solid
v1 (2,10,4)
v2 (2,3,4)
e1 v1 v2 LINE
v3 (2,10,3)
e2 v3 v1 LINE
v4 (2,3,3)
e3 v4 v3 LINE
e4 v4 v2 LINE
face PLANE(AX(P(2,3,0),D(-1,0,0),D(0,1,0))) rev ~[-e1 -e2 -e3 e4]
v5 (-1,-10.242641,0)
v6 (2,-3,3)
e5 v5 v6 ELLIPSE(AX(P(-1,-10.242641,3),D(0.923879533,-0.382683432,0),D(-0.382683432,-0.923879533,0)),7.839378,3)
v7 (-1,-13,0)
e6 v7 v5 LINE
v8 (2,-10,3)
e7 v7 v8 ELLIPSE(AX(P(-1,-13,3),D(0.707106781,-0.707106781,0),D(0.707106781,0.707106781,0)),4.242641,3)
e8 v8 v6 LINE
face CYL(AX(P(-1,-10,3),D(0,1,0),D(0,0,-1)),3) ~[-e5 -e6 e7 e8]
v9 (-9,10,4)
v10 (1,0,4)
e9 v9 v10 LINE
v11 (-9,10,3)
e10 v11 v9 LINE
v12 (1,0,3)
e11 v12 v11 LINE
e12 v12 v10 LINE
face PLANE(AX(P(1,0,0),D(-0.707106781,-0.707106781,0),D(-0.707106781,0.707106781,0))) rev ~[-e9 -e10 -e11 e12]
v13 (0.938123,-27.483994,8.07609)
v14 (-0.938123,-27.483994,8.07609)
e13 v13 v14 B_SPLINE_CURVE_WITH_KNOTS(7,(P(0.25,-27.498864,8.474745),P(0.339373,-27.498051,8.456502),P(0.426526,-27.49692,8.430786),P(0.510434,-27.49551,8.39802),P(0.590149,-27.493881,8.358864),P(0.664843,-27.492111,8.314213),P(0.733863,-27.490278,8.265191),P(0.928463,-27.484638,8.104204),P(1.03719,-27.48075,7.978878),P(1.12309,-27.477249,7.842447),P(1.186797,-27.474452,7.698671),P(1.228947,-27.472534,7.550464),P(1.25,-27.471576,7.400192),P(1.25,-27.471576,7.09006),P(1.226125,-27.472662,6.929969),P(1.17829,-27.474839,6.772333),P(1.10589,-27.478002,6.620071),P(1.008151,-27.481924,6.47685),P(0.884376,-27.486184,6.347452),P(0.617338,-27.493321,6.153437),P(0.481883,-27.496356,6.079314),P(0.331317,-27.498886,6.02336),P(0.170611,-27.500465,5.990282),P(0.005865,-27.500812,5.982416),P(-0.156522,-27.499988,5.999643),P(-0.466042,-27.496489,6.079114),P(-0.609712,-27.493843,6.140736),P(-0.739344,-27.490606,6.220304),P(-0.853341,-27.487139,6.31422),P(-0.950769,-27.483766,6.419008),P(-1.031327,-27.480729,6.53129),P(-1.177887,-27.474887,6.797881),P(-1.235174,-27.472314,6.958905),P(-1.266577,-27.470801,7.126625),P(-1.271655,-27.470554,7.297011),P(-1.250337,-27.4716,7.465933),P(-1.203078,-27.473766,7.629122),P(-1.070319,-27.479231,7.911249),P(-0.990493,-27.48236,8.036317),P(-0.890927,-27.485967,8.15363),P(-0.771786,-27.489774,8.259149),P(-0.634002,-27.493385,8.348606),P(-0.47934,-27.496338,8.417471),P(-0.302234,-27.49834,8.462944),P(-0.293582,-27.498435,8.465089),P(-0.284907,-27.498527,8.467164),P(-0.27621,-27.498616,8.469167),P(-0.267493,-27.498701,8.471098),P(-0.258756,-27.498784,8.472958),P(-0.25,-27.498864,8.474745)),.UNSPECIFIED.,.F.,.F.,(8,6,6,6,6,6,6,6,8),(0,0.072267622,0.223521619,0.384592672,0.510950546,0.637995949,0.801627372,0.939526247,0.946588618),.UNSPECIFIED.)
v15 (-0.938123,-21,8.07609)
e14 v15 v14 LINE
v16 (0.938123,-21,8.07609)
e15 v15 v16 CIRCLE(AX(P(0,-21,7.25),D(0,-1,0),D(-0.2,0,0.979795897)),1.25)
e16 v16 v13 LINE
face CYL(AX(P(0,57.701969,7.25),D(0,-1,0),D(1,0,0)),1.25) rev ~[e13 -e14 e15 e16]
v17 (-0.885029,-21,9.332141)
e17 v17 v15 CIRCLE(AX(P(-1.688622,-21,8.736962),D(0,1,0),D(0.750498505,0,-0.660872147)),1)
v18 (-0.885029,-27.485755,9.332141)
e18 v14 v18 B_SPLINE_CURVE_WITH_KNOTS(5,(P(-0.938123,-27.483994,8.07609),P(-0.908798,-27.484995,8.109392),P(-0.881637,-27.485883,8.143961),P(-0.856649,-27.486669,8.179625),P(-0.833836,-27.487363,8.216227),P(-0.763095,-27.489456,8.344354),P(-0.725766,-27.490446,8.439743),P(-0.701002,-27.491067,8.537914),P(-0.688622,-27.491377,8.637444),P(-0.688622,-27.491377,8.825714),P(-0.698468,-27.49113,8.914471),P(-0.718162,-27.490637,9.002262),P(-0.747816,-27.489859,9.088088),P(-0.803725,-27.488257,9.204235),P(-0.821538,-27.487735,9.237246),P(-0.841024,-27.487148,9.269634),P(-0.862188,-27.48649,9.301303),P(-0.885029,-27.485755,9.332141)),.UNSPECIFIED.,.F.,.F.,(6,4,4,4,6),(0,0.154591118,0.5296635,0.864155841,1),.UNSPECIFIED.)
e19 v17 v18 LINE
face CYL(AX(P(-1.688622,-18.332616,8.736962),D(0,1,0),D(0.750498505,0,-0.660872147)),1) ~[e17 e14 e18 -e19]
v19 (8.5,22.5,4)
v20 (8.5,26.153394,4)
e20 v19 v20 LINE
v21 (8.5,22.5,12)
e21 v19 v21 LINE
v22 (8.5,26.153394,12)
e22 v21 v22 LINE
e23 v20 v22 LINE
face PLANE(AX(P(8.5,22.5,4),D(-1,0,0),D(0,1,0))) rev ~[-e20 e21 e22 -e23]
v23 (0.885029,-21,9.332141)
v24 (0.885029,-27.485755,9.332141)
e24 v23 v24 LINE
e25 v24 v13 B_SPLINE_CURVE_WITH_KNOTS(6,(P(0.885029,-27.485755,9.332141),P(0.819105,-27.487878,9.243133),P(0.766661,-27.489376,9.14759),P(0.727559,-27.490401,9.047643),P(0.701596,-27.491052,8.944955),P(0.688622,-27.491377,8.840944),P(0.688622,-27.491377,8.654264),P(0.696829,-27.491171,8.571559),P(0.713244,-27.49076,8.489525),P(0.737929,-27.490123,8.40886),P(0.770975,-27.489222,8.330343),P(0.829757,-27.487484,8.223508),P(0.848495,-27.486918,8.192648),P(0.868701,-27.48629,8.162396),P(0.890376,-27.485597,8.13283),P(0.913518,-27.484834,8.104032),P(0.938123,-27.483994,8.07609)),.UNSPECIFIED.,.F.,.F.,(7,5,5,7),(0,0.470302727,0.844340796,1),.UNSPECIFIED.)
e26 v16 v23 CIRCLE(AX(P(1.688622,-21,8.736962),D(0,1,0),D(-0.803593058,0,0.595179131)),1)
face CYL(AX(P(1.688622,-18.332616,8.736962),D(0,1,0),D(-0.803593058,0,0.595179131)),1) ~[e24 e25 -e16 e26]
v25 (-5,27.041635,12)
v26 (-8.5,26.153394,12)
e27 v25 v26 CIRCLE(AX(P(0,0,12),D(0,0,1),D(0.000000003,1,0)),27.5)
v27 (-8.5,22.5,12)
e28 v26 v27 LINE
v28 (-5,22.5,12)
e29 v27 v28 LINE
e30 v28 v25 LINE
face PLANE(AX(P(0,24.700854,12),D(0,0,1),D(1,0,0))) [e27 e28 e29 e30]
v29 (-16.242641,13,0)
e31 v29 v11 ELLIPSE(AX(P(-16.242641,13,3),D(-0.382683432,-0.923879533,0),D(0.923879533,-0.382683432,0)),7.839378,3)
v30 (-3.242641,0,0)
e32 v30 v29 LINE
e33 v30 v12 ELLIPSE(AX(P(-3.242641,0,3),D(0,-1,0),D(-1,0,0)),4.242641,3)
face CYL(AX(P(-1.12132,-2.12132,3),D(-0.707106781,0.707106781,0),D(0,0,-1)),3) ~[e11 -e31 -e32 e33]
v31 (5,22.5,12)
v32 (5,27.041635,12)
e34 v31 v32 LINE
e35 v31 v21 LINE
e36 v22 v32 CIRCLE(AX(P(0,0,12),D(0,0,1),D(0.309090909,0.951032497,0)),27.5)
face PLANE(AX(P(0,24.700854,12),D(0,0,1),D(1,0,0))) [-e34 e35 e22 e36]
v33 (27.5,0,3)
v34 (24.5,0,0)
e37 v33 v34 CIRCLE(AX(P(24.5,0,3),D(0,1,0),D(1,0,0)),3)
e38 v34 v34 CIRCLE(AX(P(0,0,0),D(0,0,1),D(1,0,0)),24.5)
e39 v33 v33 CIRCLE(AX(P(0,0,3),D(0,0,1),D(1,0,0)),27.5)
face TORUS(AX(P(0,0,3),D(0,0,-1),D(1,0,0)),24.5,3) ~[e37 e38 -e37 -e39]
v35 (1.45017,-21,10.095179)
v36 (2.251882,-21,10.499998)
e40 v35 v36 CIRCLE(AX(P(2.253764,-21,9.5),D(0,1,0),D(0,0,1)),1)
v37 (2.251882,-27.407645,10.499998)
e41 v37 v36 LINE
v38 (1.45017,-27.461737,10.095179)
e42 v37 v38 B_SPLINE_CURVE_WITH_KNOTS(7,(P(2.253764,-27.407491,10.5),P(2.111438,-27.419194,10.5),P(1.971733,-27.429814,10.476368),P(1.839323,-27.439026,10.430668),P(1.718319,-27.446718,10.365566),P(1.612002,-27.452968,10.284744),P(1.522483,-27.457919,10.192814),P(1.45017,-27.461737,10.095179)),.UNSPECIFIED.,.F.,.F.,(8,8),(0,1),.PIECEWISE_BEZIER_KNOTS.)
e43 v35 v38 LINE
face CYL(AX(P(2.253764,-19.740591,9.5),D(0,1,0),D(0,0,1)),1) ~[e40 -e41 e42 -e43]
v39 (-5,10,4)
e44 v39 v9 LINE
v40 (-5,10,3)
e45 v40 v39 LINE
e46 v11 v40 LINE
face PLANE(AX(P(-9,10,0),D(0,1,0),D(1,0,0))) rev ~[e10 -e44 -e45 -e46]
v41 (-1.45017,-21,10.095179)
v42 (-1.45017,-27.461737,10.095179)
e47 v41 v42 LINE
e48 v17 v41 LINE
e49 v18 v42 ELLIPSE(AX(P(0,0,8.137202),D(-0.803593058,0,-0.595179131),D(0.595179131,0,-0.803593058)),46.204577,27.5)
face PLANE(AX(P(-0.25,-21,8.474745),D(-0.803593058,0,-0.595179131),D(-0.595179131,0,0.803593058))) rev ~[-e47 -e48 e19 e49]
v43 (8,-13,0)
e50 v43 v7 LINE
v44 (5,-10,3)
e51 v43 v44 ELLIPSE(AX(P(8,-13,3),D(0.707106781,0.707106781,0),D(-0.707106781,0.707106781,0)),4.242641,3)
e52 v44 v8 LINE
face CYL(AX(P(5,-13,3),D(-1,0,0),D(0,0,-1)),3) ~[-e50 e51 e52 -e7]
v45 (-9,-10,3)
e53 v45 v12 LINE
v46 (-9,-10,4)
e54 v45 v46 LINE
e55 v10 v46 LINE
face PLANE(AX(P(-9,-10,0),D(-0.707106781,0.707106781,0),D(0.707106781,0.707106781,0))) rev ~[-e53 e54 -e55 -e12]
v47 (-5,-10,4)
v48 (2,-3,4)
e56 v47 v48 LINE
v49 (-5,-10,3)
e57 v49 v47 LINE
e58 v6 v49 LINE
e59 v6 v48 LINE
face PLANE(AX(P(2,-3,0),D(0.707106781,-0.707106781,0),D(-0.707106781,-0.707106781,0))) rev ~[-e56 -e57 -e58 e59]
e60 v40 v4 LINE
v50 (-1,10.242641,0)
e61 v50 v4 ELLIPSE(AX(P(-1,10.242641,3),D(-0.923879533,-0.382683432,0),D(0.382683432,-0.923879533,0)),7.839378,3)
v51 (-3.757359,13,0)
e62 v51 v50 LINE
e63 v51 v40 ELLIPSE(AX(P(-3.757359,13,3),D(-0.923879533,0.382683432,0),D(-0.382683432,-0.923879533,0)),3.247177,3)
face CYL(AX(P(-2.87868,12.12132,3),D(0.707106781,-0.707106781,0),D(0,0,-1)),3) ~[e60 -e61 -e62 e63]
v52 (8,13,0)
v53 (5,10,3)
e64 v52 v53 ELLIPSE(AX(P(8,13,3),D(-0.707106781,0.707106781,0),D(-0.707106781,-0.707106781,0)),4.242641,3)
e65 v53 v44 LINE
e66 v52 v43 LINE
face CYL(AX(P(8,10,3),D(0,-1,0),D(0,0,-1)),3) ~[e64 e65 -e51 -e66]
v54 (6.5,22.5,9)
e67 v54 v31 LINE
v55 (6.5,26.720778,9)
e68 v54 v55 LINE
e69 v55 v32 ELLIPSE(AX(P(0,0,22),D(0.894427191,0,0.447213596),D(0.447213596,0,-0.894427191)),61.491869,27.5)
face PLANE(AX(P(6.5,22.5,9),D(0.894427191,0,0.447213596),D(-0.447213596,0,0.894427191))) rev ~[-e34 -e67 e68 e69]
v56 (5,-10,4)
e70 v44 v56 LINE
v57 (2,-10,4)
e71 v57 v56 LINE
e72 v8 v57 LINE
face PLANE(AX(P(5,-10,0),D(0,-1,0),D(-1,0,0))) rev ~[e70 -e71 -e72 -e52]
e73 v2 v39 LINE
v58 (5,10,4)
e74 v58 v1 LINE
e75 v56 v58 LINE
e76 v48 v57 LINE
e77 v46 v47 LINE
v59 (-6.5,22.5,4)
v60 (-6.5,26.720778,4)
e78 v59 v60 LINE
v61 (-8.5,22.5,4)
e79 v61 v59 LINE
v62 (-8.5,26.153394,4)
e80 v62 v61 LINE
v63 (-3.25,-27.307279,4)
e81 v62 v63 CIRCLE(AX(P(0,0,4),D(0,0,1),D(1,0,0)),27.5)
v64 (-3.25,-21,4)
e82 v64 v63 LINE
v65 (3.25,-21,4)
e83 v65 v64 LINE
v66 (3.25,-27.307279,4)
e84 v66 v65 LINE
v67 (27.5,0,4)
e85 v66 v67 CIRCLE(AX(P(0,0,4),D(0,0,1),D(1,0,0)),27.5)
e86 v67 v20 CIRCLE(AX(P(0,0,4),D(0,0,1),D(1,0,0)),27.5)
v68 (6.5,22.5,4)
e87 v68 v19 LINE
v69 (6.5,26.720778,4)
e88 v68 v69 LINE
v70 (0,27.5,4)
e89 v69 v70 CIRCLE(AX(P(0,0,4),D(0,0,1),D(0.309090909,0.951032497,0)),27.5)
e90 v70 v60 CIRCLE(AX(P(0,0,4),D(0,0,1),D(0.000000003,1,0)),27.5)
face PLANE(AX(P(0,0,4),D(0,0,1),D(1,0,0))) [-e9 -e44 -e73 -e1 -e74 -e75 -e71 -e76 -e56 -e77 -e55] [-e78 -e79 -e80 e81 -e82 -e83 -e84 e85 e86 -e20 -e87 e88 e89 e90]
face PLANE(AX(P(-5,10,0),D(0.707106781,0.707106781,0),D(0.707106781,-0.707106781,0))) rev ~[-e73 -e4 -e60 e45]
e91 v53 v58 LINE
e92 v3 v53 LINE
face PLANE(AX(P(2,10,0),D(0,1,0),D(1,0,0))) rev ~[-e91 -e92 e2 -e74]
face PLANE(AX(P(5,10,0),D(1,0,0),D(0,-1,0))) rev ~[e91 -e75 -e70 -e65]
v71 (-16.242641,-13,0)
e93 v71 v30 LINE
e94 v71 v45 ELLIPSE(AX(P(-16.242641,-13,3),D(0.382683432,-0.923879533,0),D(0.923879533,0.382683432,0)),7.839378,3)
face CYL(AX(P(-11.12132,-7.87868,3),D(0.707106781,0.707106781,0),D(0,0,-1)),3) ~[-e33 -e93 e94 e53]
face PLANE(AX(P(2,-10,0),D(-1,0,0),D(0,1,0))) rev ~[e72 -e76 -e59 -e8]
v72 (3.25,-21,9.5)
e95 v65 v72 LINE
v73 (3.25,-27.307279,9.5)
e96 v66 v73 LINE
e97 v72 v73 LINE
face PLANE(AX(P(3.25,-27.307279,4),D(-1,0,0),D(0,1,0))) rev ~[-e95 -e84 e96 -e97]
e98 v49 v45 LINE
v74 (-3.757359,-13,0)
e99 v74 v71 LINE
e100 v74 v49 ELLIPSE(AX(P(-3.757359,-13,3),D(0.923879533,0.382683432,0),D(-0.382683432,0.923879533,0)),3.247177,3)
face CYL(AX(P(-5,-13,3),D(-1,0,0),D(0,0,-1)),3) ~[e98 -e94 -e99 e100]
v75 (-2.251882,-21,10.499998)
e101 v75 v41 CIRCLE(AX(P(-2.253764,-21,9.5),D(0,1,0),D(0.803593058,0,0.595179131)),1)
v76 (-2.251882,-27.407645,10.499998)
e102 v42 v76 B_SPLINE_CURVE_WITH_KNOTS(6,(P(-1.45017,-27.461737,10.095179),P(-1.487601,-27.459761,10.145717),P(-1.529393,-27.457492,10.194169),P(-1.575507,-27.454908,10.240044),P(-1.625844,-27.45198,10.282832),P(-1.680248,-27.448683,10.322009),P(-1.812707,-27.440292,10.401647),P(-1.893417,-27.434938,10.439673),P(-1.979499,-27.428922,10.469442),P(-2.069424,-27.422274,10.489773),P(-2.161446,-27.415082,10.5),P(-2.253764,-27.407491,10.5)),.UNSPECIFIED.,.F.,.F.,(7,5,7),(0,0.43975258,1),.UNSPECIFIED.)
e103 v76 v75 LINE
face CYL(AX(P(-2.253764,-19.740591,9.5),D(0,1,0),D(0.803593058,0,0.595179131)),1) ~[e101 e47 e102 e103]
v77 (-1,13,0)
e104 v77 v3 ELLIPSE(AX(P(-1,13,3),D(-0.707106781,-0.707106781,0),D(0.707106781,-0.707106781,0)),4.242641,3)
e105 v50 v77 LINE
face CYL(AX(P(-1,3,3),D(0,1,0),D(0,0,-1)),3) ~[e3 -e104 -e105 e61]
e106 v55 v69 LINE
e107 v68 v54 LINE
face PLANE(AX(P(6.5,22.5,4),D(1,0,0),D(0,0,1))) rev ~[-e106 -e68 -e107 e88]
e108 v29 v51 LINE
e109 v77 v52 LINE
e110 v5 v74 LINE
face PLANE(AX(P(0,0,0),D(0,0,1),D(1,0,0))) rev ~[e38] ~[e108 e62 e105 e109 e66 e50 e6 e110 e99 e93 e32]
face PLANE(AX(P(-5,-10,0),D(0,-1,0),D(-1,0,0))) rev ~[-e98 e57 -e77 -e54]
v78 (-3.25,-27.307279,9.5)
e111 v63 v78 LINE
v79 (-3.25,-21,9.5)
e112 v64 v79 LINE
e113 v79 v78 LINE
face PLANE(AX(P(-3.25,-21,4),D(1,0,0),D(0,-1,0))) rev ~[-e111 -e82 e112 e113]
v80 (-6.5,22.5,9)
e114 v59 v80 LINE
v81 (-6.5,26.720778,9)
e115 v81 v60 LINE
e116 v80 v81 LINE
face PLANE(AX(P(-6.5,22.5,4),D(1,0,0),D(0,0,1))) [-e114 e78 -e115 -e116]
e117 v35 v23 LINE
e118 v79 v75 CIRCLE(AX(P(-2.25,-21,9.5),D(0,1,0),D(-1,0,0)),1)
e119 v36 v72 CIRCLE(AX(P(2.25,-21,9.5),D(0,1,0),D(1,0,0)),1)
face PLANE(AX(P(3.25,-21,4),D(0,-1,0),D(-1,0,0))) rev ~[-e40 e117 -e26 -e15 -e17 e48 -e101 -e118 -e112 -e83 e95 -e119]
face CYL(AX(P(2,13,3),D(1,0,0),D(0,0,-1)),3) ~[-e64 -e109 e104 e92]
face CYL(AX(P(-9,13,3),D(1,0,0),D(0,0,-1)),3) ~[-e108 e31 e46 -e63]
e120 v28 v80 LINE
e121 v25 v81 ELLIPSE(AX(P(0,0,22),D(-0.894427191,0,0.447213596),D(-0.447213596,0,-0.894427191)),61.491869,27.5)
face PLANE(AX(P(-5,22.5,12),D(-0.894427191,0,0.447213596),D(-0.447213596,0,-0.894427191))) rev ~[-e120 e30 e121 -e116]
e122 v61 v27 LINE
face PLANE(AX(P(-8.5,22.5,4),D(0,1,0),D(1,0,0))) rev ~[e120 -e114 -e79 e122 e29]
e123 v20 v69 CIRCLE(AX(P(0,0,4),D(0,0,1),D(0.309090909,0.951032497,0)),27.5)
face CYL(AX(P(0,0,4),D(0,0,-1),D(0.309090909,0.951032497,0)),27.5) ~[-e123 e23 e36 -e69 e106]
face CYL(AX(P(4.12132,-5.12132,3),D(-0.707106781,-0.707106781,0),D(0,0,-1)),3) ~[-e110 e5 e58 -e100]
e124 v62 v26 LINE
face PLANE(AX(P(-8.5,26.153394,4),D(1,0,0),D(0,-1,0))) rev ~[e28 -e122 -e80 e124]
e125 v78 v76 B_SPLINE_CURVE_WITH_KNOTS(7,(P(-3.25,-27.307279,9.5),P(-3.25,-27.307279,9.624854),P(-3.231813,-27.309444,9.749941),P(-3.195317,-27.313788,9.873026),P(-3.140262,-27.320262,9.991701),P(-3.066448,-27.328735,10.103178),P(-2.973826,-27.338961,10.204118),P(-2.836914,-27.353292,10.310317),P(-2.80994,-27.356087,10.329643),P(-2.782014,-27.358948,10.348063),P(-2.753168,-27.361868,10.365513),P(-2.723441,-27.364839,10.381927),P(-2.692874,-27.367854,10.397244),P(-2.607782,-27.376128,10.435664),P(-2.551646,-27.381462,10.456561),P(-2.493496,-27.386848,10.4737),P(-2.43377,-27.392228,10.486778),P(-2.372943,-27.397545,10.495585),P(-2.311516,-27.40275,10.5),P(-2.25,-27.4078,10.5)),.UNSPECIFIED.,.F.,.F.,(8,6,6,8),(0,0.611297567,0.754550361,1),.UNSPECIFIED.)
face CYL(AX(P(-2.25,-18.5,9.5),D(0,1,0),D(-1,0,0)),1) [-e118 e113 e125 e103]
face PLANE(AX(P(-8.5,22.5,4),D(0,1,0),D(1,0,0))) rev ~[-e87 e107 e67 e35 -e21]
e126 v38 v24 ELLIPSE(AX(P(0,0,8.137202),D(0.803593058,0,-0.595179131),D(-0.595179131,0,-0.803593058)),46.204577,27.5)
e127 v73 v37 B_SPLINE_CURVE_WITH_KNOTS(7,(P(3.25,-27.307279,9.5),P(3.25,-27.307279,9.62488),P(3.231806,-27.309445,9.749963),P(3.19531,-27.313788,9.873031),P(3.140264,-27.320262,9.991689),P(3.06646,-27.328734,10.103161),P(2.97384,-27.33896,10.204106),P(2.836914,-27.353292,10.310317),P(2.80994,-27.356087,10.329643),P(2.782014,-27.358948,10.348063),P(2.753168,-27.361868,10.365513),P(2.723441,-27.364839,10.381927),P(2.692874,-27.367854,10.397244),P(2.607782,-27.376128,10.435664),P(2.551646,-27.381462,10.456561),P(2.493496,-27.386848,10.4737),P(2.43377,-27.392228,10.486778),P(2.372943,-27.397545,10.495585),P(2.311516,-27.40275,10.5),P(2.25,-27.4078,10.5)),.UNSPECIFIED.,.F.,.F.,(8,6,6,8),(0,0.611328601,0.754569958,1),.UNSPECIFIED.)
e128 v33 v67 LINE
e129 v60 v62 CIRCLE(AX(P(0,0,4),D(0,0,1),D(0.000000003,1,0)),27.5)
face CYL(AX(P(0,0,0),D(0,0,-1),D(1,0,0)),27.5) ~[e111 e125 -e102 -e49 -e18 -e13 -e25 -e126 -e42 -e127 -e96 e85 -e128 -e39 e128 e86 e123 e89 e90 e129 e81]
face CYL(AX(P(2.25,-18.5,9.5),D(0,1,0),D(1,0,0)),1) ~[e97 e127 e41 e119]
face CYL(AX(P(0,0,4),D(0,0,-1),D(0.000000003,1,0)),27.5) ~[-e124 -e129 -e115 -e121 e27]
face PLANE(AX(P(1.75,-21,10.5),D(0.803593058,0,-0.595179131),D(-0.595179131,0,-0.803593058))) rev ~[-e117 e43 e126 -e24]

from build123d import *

# Parameters (mm, degrees)
F0_R         = 27.5
F1_DEPTH     = 4
F3_DEPTH     = 8
F4_W         = 13
F4_H         = 5
F5_DEPTH     = 25
F6_W         = 10
F6_H         = 3
F7_DEPTH     = 25
F9_DEPTH     = 25
F11_DEPTH    = 25
F13_DEPTH    = 6.5
F15_D        = 2.5
F17_DEPTH    = 25
F18_T1_DEPTH = 11.8336321238
F19_T1_DEPTH = 11.3072792493
F19_T3_DEPTH = 8.9630793076
F21_DEPTH    = 25
F22_R        = 3


# Not quite as in the source:
# - a fillet or chamfer that OpenCascade refuses, or shapes differently, is made with other operations: its cross-section is extruded or revolved along the edge and cut away or added


with BuildPart() as f1:
    # F0 (on Top) → F1 (new body)
    with BuildSketch(Plane.XY):
        Circle(F0_R)
    extrude(amount=F1_DEPTH)

    # F2 (on face) → F3 (join)
    with BuildSketch(Plane.XY.offset(4)):
        with BuildLine():
            ThreePointArc((8.5, 26.1533936612), (4.3030033163, 27.1612621662), (9e-08, 27.5))
            ThreePointArc((9e-08, 27.5), (-4.3030032274, 27.1612621803), (-8.5, 26.1533936612))
            Line((-8.5, 26.1533936612), (-8.5, 22.5))
            Line((-8.5, 22.5), (8.5, 22.5))
            Line((8.5, 22.5), (8.5, 26.1533936612))
        make_face()
    extrude(amount=F3_DEPTH)

    # F4 (on face) → F5 (cut)
    with BuildSketch(Plane.XZ.offset(-22.5)):
        with Locations((0, 6.5)):
            Rectangle(F4_W, F4_H)
    extrude(amount=-F5_DEPTH, mode=Mode.SUBTRACT)

    # F6 (on face) → F7 (cut)
    with BuildSketch(Plane.XZ.offset(-22.5)):
        with Locations((0, 10.5)):
            Rectangle(F6_W, F6_H)
    extrude(amount=-F7_DEPTH, mode=Mode.SUBTRACT)

    # F8 (on face) → F9 (cut)
    with BuildSketch(Plane.XZ.offset(-22.5)):
        Polygon((-5, 12), (-6.5, 9), (-5, 9), align=None)
    extrude(amount=-F9_DEPTH, mode=Mode.SUBTRACT)

    # F10 (on face) → F11 (cut)
    with BuildSketch(Plane.XZ.offset(-22.5)):
        Polygon((5, 9), (6.5, 9), (5, 12), align=None)
    extrude(amount=-F11_DEPTH, mode=Mode.SUBTRACT)

    # F12 (on face) → F13 (join)
    with BuildSketch(Plane.XY.offset(4)):
        with BuildLine():
            Line((3.25, -27.3072792493), (3.25, -21))
            Line((3.25, -21), (-3.25, -21))
            Line((-3.25, -21), (-3.25, -27.3072792493))
            ThreePointArc((-3.25, -27.3072792493), (-1.627854515, -27.4517775322), (0, -27.5))
            ThreePointArc((0, -27.5), (1.627854515, -27.4517775322), (3.25, -27.3072792493))
        make_face()
    extrude(amount=F13_DEPTH)

    # F15 (through all)
    with Locations(Plane(origin=(0, -21, 0), x_dir=(-1, 0, 0), z_dir=(0, 1, 0))):
        with Locations((0, 7.25)):
            Hole(F15_D / 2)

    # F16 (on face) → F17 (cut)
    with BuildSketch(Plane(origin=(0, -21, 0), x_dir=(-1, 0, 0), z_dir=(0, 1, 0))):
        with BuildLine():
            Line((-1.75, 10.5), (-0.25, 8.4747448714))
            ThreePointArc((-0.25, 8.4747448714), (0, 8.5), (0.25, 8.4747448714))
            Line((0.25, 8.4747448714), (1.75, 10.5))
            Line((1.75, 10.5), (-1.75, 10.5))
        make_face()
    extrude(amount=-F17_DEPTH, mode=Mode.SUBTRACT)

    # F18: fillet of radius 1 on 2 edges, made by hand

    # F18_s2 → F18_t1 (cut)
    with BuildSketch(Plane.XZ.offset(18.3326157402)):
        with BuildLine():
            ThreePointArc((0.8850285779, 9.3321414608), (0.6895138592, 8.6947290379), (0.9381231309, 8.0760901835))
            ThreePointArc((0.9381231309, 8.0760901835), (0.6266103523, 8.331600419), (0.25, 8.4747448714))
            Line((0.25, 8.4747448714), (0.8850285779, 9.3321414608))
        make_face()
        with BuildLine():
            ThreePointArc((-0.9381231309, 8.0760901835), (-0.6895138592, 8.6947290379), (-0.8850285779, 9.3321414608))
            Line((-0.8850285779, 9.3321414608), (-0.25, 8.4747448714))
            ThreePointArc((-0.25, 8.4747448714), (-0.6266103523, 8.331600419), (-0.9381231309, 8.0760901835))
        make_face()
    extrude(amount=F18_T1_DEPTH, mode=Mode.SUBTRACT)

    # F19: fillet of radius 1 on 4 edges, made by hand

    # F19_s2 → F19_t1 (cut)
    with BuildSketch(Plane.XZ.offset(18.5)):
        with BuildLine():
            ThreePointArc((3.25, 9.5), (2.9571067812, 10.2071067812), (2.25, 10.5))
            Line((2.25, 10.5), (3.25, 10.5))
            Line((3.25, 10.5), (3.25, 9.5))
        make_face()
        with BuildLine():
            ThreePointArc((-3.25, 9.5), (-2.9571067812, 10.2071067812), (-2.25, 10.5))
            Line((-2.25, 10.5), (-3.25, 10.5))
            Line((-3.25, 10.5), (-3.25, 9.5))
        make_face()
    extrude(amount=F19_T1_DEPTH, mode=Mode.SUBTRACT)

    # F19_s4 → F19_t3 (cut)
    with BuildSketch(Plane.XZ.offset(19.7405911939)):
        with BuildLine():
            ThreePointArc((2.2537635225, 10.5), (1.8038630505, 10.3930787005), (1.4501704647, 10.0951791306))
            Line((1.4501704647, 10.0951791306), (1.75, 10.5))
            Line((1.75, 10.5), (2.2537635225, 10.5))
        make_face()
        with BuildLine():
            ThreePointArc((-1.4501704647, 10.0951791306), (-1.8038630505, 10.3930787005), (-2.2537635225, 10.5))
            Line((-2.2537635225, 10.5), (-1.75, 10.5))
            Line((-1.75, 10.5), (-1.4501704647, 10.0951791306))
        make_face()
    extrude(amount=F19_T3_DEPTH, mode=Mode.SUBTRACT)

    # F20 (on face) → F21 (cut)
    with BuildSketch(Plane(origin=(0, 0, 0), x_dir=(1, 0, 0), z_dir=(0, 0, -1))):
        Polygon((2, -10), (5, -10), (5, 10), (2, 10), (2, 3), (-5, 10), (-9, 10), (1, 0), (-9, -10), (-5, -10), (2, -3), align=None)
    extrude(amount=-F21_DEPTH, mode=Mode.SUBTRACT)

    # F22
    f22_edges = [f1.edges().sort_by_distance(p)[0] for p in [
        (-27.5, 0, 0),
        (-1.5, 6.5, 0),
        (-7, 10, 0),
        (-4, 5, 0),
        (-4, -5, 0),
        (-7, -10, 0),
        (-1.5, -6.5, 0),
        (2, -6.5, 0),
        (3.5, -10, 0),
        (5, 0, 0),
        (3.5, 10, 0),
        (2, 6.5, 0),
    ]]
    fillet(f22_edges, radius=F22_R)


solid = f1.part
